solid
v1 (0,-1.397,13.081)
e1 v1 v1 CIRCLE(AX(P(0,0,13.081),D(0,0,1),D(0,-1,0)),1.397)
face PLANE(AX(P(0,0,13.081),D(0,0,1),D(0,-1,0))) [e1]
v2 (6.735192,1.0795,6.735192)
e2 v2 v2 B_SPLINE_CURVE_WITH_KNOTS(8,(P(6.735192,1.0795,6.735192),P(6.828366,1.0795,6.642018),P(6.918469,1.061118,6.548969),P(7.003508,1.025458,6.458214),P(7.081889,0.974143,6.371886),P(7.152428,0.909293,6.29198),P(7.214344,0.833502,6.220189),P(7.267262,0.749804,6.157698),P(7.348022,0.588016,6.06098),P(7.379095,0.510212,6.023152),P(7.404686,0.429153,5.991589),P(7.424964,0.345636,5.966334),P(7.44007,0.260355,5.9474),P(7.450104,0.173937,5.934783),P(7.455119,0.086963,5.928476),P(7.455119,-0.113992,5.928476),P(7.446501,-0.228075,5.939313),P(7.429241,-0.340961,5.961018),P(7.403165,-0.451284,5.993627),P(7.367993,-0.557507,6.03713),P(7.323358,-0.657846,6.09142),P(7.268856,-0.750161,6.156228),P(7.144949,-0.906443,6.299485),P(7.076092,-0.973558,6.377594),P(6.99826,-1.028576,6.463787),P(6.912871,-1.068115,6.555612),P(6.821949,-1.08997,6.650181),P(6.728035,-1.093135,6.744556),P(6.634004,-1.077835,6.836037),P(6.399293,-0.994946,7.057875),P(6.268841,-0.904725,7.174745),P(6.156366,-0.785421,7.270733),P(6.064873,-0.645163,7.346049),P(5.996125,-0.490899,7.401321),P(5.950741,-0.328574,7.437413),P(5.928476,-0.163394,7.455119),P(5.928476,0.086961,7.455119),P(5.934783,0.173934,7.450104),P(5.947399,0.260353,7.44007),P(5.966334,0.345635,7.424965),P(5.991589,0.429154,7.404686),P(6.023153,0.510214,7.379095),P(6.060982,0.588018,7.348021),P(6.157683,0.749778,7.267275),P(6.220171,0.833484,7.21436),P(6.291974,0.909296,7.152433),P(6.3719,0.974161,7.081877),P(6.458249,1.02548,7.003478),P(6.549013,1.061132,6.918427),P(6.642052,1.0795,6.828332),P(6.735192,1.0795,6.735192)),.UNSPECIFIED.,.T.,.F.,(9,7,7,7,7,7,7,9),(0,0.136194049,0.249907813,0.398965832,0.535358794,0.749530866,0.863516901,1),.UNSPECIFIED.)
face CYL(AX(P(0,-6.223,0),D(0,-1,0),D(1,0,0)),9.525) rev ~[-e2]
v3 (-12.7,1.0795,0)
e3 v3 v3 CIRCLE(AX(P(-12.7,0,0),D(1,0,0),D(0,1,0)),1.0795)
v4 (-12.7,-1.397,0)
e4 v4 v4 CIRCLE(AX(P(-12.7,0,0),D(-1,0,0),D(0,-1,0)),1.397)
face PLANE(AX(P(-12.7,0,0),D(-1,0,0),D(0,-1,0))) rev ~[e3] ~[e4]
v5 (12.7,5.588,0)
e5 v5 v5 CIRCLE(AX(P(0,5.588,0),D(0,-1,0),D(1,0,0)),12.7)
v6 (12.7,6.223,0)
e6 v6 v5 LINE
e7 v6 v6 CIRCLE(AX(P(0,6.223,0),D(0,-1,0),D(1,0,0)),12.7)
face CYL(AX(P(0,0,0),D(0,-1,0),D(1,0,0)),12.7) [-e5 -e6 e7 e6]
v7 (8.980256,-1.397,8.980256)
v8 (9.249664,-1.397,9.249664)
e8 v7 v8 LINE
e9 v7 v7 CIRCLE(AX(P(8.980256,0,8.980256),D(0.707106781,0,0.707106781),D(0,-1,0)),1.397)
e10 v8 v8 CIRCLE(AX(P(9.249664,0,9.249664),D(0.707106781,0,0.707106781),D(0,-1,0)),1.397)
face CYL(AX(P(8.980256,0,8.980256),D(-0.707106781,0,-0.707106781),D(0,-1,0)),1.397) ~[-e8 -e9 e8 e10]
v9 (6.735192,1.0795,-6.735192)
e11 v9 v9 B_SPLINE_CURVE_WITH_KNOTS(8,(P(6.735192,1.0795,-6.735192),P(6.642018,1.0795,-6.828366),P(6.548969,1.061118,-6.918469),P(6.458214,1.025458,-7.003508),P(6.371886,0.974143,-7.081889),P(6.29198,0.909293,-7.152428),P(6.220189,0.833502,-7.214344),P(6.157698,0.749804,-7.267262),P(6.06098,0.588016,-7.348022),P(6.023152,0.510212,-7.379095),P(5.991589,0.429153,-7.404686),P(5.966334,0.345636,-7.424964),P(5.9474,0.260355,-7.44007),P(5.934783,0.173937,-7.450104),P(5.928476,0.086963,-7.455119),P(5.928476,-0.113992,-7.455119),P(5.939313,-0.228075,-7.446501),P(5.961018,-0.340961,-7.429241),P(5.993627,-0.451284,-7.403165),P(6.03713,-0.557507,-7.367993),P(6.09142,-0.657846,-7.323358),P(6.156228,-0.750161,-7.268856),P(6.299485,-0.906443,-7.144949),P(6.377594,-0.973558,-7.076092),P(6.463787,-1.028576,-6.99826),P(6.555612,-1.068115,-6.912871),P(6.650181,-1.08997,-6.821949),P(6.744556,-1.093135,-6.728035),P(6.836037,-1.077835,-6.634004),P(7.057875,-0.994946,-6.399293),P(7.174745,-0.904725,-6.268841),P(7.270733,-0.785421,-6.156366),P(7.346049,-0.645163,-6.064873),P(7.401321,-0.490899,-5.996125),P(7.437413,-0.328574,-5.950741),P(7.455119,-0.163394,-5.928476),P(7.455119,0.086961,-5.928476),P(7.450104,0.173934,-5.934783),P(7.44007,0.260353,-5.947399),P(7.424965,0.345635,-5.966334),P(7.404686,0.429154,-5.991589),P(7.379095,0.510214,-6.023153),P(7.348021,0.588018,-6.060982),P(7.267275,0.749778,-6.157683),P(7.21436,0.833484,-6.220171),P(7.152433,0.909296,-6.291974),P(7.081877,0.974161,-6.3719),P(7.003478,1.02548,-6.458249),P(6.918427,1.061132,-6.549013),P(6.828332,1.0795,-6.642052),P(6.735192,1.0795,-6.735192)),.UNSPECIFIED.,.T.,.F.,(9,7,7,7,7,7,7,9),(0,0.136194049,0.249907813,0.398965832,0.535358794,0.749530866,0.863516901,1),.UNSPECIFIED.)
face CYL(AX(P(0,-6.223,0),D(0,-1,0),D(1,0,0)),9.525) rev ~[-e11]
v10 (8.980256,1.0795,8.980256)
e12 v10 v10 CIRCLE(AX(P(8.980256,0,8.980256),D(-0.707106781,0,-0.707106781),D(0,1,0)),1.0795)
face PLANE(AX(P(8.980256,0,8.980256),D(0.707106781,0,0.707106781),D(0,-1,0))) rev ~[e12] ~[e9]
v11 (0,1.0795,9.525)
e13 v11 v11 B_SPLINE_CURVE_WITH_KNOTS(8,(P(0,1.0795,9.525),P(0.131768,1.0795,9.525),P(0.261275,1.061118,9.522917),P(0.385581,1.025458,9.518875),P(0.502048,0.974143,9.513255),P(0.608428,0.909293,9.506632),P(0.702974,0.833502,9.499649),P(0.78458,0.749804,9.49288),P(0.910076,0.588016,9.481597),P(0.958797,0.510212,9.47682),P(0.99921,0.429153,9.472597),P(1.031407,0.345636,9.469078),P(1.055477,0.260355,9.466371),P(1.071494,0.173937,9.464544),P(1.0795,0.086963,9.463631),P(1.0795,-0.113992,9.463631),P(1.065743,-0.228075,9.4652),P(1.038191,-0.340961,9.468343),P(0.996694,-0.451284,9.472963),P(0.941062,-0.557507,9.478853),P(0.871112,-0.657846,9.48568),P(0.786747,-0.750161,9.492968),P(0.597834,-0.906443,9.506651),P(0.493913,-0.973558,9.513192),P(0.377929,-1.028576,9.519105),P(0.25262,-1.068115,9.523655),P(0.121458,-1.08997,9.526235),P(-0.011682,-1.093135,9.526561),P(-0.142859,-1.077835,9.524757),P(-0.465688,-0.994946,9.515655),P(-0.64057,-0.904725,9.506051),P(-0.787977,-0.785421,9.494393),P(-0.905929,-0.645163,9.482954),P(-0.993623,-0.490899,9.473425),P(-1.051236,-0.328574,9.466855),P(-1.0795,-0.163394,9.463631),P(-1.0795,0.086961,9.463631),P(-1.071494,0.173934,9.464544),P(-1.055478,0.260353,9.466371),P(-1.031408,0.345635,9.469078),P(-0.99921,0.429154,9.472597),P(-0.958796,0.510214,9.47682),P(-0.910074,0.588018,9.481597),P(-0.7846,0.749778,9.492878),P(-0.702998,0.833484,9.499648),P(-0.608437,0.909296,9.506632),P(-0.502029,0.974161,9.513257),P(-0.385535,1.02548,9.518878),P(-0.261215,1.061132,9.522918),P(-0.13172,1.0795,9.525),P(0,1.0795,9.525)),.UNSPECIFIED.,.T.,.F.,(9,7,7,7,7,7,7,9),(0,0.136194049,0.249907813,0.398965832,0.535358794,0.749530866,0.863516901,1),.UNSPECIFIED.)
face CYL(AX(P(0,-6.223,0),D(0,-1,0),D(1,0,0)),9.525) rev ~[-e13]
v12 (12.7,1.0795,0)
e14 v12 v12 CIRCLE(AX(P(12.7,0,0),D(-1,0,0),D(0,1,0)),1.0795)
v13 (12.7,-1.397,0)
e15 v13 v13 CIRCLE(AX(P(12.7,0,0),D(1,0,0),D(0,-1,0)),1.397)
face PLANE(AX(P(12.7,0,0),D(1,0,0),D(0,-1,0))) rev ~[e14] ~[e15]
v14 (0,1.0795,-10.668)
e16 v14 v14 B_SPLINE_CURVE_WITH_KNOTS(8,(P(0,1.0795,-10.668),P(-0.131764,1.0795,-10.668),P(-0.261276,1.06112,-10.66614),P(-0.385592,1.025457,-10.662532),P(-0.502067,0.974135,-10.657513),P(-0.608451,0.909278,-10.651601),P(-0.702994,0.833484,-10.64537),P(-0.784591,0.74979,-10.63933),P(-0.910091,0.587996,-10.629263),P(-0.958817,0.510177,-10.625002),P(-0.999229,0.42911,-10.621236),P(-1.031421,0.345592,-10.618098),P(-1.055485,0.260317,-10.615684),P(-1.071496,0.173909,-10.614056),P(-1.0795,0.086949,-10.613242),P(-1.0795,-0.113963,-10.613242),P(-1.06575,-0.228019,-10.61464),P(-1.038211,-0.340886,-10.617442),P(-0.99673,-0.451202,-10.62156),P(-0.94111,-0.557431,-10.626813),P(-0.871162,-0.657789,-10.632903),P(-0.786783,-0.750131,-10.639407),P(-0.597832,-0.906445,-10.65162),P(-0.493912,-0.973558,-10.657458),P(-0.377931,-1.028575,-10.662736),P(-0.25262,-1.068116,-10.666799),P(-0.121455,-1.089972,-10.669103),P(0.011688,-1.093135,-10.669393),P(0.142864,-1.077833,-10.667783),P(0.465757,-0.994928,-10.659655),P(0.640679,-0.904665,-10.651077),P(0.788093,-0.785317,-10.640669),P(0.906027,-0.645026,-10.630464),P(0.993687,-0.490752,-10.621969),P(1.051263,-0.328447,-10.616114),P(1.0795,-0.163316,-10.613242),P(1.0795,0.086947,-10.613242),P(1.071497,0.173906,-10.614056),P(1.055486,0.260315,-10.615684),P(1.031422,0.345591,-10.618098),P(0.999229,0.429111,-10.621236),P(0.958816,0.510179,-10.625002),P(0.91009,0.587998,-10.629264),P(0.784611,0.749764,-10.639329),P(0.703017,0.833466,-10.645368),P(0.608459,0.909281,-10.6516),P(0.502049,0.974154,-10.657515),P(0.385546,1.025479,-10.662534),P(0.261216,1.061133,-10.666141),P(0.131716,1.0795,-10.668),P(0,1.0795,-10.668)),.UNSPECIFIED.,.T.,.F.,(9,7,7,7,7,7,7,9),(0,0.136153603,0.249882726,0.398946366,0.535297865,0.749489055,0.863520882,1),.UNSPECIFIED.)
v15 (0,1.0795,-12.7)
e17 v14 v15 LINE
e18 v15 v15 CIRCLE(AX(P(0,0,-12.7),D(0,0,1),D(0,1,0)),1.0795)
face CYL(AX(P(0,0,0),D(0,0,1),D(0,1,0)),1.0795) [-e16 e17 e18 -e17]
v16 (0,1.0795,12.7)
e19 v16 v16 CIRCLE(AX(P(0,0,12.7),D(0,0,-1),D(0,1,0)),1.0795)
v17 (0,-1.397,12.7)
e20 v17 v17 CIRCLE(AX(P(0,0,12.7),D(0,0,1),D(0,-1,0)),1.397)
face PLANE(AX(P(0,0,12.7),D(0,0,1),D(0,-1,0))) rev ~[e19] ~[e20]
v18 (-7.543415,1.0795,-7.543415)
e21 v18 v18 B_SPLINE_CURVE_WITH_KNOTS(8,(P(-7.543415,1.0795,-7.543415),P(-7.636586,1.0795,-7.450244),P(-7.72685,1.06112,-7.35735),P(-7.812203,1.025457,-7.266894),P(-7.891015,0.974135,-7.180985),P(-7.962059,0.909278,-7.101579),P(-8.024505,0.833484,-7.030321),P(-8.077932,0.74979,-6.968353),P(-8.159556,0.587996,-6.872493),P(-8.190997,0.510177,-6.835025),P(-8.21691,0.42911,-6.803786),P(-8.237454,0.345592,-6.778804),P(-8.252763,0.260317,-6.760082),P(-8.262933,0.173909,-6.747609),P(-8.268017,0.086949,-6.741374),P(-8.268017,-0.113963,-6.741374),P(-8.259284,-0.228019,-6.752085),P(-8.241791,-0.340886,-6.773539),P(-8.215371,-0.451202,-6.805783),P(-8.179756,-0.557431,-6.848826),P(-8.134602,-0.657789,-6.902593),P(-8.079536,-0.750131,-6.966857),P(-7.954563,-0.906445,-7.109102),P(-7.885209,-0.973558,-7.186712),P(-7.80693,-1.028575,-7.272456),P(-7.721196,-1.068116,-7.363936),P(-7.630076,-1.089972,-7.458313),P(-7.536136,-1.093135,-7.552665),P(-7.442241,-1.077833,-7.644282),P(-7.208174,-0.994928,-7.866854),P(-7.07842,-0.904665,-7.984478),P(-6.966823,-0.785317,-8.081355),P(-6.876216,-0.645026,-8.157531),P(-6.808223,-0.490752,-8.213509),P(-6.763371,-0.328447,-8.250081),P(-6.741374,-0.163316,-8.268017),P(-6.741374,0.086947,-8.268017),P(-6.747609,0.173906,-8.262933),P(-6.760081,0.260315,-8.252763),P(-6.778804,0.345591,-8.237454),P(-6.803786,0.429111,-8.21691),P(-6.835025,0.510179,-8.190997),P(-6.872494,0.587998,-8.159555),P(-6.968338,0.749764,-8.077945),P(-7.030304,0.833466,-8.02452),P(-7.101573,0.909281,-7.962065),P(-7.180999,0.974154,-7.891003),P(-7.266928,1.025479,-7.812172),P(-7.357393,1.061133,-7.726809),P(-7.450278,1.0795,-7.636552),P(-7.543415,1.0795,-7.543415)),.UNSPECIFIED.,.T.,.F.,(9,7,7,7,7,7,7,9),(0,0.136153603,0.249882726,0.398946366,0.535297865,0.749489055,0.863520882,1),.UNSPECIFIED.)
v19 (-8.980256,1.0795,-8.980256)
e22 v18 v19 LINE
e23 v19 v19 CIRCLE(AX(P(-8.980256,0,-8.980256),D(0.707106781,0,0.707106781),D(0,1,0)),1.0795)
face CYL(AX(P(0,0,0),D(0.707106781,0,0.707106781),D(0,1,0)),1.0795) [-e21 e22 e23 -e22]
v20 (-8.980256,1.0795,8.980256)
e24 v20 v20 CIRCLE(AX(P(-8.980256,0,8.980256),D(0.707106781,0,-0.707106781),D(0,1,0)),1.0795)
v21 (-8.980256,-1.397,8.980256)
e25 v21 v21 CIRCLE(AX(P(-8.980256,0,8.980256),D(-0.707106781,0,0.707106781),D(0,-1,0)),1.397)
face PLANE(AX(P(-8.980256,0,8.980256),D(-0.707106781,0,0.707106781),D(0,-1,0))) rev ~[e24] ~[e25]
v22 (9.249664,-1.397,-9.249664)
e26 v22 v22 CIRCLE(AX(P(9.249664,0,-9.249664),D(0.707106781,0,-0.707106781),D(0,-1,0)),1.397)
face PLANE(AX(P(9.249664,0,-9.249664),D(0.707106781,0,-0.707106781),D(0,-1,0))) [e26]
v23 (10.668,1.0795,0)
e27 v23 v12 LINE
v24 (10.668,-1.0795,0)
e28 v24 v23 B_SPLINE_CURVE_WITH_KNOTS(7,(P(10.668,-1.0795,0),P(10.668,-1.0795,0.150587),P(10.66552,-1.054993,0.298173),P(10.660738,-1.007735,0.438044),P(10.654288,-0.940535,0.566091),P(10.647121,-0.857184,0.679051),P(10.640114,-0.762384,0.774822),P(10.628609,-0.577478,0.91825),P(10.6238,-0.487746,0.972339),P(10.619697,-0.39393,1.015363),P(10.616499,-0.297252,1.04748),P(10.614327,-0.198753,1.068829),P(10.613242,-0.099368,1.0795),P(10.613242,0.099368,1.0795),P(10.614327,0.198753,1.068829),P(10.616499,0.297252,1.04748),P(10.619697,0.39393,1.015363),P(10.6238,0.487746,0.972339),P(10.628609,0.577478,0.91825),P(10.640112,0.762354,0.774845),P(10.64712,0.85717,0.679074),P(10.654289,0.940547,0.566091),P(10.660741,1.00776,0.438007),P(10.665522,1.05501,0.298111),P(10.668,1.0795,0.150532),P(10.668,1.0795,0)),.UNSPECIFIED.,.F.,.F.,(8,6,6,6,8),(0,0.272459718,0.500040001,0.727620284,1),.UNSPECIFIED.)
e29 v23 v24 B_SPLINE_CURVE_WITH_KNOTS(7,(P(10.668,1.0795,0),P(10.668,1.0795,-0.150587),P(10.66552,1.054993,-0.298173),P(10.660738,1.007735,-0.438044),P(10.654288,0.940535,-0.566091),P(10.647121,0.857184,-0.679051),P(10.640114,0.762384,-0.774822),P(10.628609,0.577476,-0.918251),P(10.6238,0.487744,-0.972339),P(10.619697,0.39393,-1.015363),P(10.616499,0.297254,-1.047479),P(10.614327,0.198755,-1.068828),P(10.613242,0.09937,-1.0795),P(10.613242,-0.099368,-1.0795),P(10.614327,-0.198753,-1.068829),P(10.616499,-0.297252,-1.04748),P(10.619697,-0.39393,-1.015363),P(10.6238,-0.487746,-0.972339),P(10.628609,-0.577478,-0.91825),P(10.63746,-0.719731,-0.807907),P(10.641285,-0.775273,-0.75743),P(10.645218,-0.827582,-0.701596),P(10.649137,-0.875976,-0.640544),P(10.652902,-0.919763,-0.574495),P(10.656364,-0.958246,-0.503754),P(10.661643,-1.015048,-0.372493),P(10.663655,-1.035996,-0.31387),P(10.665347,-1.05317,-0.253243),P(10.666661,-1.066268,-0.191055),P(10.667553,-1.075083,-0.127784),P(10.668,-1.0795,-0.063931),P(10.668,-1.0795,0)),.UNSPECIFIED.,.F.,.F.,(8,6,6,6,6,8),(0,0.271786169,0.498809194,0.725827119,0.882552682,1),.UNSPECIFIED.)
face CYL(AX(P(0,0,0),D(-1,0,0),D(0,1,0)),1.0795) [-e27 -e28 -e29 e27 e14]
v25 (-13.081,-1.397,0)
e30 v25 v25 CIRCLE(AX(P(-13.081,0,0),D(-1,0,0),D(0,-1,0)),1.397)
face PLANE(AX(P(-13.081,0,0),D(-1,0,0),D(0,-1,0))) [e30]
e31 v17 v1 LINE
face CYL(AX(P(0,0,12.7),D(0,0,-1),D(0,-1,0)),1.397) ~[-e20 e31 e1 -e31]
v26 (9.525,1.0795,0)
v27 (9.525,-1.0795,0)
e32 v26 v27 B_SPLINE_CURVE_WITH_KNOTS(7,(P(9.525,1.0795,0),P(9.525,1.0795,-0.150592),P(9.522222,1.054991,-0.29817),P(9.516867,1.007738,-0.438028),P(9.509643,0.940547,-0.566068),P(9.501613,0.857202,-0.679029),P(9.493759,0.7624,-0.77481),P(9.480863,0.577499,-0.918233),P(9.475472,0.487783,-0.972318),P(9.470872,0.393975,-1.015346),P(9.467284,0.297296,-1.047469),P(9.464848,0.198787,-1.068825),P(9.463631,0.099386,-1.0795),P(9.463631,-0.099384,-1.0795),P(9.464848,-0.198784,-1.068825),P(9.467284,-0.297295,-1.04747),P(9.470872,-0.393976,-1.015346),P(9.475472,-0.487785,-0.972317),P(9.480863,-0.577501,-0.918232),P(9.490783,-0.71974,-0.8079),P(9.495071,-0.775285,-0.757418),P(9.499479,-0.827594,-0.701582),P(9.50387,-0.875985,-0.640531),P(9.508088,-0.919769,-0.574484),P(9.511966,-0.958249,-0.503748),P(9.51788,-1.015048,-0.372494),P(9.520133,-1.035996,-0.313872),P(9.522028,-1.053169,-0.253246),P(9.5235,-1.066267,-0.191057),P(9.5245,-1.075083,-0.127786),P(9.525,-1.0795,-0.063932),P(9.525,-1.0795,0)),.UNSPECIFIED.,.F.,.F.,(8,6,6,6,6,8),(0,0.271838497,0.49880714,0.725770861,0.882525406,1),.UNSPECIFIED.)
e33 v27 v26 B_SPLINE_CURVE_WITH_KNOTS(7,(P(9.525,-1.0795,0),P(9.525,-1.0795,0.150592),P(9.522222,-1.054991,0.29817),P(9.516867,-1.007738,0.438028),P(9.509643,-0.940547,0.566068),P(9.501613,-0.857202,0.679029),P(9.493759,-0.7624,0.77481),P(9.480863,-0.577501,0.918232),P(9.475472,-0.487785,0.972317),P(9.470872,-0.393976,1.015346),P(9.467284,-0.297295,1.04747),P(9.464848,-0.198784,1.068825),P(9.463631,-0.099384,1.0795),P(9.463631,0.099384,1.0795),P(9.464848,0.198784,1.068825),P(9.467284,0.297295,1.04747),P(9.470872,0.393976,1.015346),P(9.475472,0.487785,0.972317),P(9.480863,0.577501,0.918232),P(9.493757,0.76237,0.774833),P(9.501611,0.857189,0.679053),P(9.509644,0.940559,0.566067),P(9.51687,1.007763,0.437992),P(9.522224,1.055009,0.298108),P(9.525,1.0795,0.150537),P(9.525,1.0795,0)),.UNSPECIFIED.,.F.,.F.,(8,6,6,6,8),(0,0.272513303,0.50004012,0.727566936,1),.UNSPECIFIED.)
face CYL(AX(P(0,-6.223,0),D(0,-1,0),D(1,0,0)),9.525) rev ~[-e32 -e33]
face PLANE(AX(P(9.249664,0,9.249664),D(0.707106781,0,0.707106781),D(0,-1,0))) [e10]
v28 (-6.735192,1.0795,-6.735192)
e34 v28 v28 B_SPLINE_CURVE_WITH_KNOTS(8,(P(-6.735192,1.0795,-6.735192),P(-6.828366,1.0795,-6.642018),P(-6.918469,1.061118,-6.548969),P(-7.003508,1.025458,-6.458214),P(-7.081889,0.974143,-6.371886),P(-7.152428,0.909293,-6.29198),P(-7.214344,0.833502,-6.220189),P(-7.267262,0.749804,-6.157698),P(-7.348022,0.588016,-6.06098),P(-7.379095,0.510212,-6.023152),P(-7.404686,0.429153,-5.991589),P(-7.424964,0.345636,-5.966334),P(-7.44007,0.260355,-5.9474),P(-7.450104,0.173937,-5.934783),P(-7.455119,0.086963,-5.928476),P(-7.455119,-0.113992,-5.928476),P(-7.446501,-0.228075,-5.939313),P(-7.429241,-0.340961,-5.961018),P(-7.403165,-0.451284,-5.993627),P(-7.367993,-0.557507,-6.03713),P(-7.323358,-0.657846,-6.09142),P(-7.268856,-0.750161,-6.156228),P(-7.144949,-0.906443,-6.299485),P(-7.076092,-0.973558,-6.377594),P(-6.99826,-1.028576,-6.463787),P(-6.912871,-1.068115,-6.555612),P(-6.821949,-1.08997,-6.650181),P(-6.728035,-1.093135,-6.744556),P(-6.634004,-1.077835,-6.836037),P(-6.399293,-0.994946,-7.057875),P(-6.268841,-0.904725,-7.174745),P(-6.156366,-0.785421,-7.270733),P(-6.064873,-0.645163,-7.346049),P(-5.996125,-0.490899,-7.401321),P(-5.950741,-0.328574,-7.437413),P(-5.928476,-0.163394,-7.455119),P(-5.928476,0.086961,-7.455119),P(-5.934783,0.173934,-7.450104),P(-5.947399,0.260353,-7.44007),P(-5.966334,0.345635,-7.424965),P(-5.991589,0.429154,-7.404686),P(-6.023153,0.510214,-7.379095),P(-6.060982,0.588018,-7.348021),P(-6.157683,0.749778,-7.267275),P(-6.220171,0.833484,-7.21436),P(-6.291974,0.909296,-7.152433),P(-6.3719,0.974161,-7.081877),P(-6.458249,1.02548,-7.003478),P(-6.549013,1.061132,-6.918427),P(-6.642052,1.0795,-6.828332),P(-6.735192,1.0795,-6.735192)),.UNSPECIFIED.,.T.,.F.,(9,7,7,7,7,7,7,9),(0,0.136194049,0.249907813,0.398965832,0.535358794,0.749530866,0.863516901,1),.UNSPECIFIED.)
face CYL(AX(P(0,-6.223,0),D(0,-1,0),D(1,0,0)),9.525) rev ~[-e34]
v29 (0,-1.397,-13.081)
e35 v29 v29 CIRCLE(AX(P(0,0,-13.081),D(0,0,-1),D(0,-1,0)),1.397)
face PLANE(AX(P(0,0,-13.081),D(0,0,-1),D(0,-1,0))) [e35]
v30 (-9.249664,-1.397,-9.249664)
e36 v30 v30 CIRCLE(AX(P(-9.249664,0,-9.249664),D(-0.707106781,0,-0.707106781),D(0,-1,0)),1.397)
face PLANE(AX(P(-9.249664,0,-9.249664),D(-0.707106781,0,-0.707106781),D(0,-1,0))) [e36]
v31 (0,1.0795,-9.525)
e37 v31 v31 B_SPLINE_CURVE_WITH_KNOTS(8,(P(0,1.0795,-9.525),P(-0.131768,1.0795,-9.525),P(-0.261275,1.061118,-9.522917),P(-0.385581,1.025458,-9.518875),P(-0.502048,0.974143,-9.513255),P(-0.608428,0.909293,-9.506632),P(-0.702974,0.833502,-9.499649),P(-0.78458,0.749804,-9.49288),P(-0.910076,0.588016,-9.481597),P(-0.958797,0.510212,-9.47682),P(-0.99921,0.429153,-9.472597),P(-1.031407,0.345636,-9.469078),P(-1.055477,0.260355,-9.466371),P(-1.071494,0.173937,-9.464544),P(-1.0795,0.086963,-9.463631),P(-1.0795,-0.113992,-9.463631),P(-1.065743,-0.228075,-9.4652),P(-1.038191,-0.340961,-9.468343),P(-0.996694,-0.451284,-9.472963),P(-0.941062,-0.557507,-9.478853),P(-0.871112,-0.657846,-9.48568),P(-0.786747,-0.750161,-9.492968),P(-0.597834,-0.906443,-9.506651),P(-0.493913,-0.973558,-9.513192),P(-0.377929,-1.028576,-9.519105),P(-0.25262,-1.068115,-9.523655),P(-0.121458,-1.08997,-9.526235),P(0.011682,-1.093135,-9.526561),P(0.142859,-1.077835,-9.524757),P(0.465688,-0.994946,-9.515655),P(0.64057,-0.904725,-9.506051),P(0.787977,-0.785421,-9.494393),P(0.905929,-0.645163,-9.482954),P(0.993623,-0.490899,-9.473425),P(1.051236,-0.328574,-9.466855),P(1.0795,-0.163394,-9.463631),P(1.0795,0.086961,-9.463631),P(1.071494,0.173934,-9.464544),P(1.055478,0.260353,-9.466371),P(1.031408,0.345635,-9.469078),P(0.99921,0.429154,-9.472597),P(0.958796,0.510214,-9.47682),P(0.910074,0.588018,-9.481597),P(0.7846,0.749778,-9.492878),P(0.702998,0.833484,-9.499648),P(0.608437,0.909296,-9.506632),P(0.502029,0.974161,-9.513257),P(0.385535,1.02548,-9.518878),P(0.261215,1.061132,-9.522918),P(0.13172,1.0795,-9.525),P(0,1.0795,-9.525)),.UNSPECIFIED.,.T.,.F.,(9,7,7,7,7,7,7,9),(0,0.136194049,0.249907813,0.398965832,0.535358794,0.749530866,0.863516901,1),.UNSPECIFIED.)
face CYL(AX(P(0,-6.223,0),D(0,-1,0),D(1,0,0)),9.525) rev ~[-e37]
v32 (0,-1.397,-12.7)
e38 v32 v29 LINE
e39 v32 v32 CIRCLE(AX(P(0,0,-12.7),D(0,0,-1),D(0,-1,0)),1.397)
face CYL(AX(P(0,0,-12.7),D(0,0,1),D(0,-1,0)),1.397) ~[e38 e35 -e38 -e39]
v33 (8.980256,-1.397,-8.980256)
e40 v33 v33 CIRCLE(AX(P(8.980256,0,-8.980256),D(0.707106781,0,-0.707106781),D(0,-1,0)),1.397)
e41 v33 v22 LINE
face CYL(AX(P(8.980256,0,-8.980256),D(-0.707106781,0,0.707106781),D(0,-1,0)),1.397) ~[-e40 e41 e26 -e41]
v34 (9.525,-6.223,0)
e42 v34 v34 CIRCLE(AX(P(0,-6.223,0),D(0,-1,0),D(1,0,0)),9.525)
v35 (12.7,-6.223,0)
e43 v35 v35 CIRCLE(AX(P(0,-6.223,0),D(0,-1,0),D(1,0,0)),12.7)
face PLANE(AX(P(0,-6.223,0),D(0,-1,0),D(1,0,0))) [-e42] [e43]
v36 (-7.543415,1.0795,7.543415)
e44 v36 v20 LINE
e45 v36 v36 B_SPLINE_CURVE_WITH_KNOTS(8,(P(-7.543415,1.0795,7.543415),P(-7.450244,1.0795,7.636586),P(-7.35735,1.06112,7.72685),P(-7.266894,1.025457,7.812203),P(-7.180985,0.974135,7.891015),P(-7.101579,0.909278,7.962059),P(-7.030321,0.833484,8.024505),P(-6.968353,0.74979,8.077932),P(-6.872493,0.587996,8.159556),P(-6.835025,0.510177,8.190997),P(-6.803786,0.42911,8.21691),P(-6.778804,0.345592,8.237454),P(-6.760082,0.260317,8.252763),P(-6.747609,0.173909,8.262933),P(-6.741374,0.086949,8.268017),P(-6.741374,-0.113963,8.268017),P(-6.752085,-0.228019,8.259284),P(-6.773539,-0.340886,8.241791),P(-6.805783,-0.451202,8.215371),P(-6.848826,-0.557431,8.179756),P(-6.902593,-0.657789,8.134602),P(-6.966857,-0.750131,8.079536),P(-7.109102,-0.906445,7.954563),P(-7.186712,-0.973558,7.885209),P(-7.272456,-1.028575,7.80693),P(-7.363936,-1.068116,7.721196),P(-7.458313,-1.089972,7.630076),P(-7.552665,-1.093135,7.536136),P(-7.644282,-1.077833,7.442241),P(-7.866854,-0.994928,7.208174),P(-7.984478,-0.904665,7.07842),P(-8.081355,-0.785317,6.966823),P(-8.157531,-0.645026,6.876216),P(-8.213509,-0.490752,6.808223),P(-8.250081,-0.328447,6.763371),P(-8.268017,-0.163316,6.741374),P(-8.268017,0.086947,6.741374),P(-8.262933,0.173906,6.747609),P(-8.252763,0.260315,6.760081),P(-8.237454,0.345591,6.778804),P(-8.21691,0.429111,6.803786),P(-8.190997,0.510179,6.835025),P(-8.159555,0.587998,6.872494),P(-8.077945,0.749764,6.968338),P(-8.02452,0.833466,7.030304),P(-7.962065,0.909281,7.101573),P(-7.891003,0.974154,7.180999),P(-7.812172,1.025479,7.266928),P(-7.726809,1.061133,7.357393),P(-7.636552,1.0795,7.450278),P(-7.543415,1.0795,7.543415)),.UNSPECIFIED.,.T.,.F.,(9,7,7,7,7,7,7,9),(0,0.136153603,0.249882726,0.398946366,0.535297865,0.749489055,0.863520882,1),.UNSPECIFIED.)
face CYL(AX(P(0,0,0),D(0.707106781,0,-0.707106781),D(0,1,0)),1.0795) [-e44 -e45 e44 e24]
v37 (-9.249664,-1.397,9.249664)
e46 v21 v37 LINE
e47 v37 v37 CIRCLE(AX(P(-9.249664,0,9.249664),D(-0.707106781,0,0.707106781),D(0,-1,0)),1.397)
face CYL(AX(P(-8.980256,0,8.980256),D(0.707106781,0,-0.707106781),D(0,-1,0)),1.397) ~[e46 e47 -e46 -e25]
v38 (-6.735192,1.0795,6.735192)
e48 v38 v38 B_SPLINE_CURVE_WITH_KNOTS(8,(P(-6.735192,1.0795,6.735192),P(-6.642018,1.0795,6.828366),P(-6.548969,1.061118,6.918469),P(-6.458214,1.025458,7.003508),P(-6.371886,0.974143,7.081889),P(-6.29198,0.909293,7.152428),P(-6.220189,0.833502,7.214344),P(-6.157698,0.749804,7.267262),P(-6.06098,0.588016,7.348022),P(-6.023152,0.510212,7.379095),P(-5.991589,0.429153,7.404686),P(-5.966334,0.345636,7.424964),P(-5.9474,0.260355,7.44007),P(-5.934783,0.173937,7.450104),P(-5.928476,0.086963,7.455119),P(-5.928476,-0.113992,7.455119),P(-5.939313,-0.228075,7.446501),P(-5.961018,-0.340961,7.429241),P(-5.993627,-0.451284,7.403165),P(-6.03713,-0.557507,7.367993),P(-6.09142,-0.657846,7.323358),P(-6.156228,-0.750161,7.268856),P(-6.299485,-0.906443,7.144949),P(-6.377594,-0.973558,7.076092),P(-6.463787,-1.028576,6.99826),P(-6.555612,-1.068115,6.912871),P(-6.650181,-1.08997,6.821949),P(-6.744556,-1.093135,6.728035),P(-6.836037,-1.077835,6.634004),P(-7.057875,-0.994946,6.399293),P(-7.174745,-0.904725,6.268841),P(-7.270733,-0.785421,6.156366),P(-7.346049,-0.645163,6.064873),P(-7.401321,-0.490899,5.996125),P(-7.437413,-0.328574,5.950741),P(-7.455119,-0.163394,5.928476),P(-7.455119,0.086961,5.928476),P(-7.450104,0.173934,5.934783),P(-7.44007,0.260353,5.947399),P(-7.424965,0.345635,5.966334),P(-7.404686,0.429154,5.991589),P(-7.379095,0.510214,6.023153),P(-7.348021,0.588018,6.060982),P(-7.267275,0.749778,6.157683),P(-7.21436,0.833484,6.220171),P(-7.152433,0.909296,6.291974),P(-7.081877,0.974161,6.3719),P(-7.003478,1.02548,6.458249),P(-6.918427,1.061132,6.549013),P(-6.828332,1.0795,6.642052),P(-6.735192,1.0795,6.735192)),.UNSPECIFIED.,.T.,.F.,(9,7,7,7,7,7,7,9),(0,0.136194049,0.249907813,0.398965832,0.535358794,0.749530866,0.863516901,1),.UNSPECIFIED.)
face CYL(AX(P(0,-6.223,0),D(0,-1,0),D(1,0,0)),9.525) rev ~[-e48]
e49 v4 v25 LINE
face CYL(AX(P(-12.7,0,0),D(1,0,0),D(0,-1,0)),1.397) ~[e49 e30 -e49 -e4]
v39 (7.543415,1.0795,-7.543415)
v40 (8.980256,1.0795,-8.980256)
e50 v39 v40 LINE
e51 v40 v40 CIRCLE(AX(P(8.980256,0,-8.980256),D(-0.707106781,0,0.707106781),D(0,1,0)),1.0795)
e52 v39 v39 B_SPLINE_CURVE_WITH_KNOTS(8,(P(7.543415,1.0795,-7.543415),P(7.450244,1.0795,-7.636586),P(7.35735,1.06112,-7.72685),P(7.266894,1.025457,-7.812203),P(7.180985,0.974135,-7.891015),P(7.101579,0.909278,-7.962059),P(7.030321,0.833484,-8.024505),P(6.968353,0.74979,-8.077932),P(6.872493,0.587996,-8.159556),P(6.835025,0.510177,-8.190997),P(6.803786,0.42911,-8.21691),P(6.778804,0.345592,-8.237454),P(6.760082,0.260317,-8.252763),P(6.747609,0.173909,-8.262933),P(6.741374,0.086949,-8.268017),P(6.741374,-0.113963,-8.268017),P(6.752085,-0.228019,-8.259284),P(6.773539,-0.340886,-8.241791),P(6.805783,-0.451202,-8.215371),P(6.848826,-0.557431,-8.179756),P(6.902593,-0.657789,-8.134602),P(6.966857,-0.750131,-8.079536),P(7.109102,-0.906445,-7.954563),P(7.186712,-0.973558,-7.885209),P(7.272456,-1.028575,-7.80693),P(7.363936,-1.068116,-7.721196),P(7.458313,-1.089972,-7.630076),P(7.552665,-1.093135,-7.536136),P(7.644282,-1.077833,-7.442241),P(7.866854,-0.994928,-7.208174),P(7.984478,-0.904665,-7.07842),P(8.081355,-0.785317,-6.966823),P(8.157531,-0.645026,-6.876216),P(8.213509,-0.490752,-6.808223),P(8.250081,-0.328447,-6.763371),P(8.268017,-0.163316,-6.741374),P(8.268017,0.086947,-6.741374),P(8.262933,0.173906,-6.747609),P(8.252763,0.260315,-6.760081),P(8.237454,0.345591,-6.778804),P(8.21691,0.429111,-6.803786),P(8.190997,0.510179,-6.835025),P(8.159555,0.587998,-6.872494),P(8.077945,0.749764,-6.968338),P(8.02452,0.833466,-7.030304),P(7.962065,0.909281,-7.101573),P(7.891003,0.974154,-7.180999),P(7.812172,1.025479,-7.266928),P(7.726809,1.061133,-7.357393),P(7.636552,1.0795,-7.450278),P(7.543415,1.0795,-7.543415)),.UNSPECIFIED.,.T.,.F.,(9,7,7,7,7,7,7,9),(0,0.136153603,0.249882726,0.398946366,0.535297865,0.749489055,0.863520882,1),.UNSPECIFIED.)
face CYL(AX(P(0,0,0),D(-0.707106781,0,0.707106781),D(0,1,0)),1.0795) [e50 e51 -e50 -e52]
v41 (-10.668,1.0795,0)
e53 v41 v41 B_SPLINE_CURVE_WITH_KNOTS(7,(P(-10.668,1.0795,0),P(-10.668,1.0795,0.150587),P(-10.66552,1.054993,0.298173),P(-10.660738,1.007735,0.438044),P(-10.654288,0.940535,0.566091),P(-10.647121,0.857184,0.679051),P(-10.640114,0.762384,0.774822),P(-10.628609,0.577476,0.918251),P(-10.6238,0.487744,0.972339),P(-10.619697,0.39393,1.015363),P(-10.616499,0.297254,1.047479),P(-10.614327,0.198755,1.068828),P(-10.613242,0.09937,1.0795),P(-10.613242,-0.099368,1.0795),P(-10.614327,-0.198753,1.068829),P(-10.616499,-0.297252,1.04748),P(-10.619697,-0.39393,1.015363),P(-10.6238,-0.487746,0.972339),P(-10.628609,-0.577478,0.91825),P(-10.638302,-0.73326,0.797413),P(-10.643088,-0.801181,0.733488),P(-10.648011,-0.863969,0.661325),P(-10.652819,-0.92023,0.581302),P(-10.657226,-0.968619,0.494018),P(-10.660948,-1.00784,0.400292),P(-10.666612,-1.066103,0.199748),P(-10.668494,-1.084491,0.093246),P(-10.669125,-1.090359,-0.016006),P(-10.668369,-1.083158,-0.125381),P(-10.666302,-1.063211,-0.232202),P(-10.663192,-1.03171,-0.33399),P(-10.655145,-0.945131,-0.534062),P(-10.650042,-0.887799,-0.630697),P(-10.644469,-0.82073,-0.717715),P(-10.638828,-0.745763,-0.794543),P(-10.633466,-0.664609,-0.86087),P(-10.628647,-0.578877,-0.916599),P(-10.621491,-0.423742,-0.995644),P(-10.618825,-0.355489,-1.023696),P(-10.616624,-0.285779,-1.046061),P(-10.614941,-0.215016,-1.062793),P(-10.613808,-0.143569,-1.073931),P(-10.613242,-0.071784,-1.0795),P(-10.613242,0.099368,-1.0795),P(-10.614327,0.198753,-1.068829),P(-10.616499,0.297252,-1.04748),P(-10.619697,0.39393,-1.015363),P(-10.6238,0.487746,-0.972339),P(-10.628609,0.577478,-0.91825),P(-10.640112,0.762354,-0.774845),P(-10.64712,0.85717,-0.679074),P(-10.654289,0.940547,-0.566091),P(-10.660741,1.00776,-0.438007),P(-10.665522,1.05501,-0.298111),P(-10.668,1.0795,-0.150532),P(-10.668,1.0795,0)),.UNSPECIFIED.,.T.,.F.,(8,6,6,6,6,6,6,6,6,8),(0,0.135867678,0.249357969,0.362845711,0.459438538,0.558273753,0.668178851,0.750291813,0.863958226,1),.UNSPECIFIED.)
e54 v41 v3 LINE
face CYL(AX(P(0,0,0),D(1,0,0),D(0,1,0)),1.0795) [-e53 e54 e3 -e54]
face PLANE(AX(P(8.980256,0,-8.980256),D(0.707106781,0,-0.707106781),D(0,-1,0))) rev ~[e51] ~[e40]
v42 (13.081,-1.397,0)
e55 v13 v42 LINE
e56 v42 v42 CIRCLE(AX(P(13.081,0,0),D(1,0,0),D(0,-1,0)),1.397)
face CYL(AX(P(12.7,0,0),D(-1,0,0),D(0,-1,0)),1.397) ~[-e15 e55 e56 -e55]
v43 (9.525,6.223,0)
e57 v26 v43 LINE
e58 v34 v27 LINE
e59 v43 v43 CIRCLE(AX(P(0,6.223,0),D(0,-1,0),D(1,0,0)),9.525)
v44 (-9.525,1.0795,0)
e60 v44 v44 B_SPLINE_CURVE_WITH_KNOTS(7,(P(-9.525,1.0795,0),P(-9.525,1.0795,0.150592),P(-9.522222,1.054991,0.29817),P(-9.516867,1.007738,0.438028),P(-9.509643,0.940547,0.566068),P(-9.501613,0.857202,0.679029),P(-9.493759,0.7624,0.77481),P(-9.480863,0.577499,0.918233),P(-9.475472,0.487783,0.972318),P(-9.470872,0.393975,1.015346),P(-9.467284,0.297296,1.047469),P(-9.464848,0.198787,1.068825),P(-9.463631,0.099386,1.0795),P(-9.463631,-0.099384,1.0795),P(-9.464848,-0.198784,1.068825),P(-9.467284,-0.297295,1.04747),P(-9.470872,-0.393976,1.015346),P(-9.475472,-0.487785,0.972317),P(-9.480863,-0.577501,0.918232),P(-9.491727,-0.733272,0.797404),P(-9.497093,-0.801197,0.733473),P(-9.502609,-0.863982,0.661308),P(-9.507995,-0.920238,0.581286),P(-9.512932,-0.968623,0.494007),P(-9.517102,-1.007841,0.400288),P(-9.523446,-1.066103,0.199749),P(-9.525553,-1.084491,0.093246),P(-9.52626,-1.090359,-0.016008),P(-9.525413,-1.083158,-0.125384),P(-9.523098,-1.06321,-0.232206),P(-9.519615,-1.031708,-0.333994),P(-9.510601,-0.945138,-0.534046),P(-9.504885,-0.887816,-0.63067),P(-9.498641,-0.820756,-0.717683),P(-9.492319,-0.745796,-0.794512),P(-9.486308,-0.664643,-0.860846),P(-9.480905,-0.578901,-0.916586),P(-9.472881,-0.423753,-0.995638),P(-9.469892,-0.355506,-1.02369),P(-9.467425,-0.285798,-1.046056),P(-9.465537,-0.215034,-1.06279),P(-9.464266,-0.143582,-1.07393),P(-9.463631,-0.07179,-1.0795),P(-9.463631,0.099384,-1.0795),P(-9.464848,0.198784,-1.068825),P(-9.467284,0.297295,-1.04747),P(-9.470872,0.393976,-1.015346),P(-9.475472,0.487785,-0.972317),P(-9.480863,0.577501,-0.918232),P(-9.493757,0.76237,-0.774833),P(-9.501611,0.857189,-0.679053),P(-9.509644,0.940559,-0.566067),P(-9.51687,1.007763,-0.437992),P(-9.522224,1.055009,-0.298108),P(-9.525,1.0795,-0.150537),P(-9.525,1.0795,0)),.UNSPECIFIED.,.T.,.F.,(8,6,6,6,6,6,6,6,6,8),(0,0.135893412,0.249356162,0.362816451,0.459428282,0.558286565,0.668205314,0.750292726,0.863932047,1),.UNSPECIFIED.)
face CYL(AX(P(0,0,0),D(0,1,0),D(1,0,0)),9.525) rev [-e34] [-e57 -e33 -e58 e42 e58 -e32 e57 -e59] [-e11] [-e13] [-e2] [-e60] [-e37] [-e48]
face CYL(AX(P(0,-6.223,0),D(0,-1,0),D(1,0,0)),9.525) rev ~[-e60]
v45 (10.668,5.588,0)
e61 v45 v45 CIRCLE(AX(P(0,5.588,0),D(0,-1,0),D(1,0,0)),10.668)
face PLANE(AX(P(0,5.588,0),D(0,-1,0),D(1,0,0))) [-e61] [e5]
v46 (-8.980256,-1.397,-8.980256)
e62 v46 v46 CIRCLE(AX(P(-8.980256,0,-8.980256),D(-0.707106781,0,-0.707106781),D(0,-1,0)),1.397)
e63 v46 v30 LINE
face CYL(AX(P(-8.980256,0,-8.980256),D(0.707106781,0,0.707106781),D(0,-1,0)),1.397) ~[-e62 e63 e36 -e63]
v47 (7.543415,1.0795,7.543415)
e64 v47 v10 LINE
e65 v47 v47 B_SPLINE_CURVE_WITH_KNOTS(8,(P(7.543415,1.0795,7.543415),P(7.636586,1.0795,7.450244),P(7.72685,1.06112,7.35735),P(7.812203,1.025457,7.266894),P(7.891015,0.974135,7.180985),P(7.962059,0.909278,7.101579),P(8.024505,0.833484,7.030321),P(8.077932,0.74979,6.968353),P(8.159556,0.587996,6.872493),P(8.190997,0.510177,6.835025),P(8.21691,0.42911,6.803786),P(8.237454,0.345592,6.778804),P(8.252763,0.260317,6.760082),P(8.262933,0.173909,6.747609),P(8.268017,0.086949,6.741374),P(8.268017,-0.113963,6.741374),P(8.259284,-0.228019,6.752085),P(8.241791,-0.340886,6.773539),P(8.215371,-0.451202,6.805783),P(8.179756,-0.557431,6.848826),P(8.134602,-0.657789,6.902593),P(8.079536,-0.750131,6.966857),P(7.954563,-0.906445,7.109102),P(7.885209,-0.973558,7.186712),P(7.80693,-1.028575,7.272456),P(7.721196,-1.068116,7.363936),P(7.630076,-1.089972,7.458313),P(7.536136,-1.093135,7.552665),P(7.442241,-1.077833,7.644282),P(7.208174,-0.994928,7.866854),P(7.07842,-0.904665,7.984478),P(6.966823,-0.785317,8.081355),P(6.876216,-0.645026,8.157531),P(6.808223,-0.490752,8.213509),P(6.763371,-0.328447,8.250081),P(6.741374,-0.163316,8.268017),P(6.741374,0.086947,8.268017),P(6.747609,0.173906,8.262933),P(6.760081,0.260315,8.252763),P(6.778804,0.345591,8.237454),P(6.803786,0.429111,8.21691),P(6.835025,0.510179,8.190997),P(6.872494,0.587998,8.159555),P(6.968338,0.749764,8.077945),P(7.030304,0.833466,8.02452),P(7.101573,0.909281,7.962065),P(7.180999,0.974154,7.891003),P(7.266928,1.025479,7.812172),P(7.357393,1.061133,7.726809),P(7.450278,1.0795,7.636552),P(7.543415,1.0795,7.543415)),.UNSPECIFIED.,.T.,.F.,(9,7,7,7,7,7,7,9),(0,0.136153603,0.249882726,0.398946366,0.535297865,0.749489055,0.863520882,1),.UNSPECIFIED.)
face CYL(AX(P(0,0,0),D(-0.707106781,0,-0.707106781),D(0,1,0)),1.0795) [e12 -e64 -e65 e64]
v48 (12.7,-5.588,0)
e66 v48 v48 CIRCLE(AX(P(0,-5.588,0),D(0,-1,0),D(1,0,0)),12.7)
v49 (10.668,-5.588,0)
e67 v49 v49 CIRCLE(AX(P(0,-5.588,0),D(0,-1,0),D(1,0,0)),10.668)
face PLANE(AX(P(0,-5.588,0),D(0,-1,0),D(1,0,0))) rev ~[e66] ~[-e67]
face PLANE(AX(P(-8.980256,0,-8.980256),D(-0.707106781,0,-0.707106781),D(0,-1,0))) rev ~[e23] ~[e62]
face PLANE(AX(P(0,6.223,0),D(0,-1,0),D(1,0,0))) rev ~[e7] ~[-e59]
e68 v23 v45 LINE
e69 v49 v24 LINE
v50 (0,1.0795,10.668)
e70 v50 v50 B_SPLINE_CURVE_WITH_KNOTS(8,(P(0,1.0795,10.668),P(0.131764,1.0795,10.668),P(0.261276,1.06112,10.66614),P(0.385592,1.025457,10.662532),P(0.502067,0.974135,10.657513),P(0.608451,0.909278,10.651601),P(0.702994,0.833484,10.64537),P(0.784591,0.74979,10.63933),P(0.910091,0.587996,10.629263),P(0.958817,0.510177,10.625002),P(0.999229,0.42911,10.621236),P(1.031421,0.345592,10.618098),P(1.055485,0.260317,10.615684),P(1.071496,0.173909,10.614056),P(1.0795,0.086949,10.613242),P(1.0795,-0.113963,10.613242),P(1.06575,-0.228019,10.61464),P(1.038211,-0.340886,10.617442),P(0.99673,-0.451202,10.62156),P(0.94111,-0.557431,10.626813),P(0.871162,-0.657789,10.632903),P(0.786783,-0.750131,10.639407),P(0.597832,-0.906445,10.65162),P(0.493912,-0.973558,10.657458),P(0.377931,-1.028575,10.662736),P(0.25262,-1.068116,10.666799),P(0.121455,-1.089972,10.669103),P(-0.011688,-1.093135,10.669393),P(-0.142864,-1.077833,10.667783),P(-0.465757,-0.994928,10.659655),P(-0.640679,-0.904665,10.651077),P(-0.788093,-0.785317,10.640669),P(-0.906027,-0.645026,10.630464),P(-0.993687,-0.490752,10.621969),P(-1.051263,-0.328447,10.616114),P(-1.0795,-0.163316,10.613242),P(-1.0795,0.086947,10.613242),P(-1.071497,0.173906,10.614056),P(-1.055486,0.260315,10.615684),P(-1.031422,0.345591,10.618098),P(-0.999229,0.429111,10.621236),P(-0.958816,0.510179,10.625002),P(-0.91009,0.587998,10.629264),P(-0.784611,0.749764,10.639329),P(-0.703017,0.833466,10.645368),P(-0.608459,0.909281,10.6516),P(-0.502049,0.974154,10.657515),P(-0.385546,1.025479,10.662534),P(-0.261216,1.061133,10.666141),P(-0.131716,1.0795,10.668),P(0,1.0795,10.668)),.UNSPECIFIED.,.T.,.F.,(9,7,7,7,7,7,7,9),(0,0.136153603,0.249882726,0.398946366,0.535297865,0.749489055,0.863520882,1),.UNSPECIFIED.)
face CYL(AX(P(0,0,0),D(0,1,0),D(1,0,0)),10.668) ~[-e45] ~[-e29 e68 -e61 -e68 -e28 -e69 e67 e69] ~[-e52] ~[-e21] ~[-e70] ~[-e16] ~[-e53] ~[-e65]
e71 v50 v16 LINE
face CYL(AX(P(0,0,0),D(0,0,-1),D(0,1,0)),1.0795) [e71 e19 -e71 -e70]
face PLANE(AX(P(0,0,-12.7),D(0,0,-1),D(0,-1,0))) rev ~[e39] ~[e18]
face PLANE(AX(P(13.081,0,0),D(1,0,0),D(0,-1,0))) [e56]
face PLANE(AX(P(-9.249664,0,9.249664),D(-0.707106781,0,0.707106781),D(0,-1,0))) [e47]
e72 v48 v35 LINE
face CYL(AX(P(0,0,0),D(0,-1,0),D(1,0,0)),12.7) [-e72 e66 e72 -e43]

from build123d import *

# Parameters (mm, degrees)
F0_R            = 12.7
F0_R_2          = 9.525
F1_DEPTH        = 6.223
F2_R            = 15.24
F2_R_2          = 10.668
F3_DEPTH        = 5.588
F4_R            = 1.0795
F6_DEPTH        = 12.7
F6_COPIES_COUNT = 8
F7_R            = 1.397
F8_DEPTH        = 0.381
F8_COPIES_COUNT = 8
F9_R            = 9.525
F10_DEPTH       = 12.4470001


# Not quite as in the source:
# - a pattern or mirror of a feature is missing from the dataset's text; its kind, count and spacing are read off the source's solid


with BuildPart() as f1:
    # F0 (on Front) → F1 (new body, symmetric)
    with BuildSketch(Plane.XZ):
        Circle(F0_R)
        Circle(F0_R_2, mode=Mode.SUBTRACT)
    extrude(amount=F1_DEPTH, both=True)

    # F2 (on Front) → F3 (cut, symmetric)
    with BuildSketch(Plane.XZ):
        Circle(F2_R)
        Circle(F2_R_2, mode=Mode.SUBTRACT)
    extrude(amount=F3_DEPTH, both=True, mode=Mode.SUBTRACT)

    # F4 (on Right) → F6 (join)
    with BuildSketch(Plane.YZ):
        Circle(F4_R)
    f6 = extrude(amount=-F6_DEPTH)

    # F6_copies: F6 ×8 about axis
    f6_copies_axis = Axis((0, 0, 0), (0, 1, 0))
    for i in range(1, F6_COPIES_COUNT):
        add(f6.rotate(f6_copies_axis, i * 360 / F6_COPIES_COUNT))

    # F7 (on face) → F8 (join)
    with BuildSketch(Plane(origin=(-12.7, 0, 0), x_dir=(0, -1, 0), z_dir=(-1, 0, 0))):
        Circle(F7_R)
    f8 = extrude(amount=F8_DEPTH)

    # F8_copies: F8 ×8 about axis
    f8_copies_axis = Axis((0, 0, 0), (0, 1, 0))
    for i in range(1, F8_COPIES_COUNT):
        add(f8.rotate(f8_copies_axis, i * 360 / F8_COPIES_COUNT))

    # F9 (on face) → F10 (cut, through all)
    with BuildSketch(Plane.XZ.offset(6.223)):
        Circle(F9_R)
    extrude(amount=-F10_DEPTH, mode=Mode.SUBTRACT)


solid = f1.part
